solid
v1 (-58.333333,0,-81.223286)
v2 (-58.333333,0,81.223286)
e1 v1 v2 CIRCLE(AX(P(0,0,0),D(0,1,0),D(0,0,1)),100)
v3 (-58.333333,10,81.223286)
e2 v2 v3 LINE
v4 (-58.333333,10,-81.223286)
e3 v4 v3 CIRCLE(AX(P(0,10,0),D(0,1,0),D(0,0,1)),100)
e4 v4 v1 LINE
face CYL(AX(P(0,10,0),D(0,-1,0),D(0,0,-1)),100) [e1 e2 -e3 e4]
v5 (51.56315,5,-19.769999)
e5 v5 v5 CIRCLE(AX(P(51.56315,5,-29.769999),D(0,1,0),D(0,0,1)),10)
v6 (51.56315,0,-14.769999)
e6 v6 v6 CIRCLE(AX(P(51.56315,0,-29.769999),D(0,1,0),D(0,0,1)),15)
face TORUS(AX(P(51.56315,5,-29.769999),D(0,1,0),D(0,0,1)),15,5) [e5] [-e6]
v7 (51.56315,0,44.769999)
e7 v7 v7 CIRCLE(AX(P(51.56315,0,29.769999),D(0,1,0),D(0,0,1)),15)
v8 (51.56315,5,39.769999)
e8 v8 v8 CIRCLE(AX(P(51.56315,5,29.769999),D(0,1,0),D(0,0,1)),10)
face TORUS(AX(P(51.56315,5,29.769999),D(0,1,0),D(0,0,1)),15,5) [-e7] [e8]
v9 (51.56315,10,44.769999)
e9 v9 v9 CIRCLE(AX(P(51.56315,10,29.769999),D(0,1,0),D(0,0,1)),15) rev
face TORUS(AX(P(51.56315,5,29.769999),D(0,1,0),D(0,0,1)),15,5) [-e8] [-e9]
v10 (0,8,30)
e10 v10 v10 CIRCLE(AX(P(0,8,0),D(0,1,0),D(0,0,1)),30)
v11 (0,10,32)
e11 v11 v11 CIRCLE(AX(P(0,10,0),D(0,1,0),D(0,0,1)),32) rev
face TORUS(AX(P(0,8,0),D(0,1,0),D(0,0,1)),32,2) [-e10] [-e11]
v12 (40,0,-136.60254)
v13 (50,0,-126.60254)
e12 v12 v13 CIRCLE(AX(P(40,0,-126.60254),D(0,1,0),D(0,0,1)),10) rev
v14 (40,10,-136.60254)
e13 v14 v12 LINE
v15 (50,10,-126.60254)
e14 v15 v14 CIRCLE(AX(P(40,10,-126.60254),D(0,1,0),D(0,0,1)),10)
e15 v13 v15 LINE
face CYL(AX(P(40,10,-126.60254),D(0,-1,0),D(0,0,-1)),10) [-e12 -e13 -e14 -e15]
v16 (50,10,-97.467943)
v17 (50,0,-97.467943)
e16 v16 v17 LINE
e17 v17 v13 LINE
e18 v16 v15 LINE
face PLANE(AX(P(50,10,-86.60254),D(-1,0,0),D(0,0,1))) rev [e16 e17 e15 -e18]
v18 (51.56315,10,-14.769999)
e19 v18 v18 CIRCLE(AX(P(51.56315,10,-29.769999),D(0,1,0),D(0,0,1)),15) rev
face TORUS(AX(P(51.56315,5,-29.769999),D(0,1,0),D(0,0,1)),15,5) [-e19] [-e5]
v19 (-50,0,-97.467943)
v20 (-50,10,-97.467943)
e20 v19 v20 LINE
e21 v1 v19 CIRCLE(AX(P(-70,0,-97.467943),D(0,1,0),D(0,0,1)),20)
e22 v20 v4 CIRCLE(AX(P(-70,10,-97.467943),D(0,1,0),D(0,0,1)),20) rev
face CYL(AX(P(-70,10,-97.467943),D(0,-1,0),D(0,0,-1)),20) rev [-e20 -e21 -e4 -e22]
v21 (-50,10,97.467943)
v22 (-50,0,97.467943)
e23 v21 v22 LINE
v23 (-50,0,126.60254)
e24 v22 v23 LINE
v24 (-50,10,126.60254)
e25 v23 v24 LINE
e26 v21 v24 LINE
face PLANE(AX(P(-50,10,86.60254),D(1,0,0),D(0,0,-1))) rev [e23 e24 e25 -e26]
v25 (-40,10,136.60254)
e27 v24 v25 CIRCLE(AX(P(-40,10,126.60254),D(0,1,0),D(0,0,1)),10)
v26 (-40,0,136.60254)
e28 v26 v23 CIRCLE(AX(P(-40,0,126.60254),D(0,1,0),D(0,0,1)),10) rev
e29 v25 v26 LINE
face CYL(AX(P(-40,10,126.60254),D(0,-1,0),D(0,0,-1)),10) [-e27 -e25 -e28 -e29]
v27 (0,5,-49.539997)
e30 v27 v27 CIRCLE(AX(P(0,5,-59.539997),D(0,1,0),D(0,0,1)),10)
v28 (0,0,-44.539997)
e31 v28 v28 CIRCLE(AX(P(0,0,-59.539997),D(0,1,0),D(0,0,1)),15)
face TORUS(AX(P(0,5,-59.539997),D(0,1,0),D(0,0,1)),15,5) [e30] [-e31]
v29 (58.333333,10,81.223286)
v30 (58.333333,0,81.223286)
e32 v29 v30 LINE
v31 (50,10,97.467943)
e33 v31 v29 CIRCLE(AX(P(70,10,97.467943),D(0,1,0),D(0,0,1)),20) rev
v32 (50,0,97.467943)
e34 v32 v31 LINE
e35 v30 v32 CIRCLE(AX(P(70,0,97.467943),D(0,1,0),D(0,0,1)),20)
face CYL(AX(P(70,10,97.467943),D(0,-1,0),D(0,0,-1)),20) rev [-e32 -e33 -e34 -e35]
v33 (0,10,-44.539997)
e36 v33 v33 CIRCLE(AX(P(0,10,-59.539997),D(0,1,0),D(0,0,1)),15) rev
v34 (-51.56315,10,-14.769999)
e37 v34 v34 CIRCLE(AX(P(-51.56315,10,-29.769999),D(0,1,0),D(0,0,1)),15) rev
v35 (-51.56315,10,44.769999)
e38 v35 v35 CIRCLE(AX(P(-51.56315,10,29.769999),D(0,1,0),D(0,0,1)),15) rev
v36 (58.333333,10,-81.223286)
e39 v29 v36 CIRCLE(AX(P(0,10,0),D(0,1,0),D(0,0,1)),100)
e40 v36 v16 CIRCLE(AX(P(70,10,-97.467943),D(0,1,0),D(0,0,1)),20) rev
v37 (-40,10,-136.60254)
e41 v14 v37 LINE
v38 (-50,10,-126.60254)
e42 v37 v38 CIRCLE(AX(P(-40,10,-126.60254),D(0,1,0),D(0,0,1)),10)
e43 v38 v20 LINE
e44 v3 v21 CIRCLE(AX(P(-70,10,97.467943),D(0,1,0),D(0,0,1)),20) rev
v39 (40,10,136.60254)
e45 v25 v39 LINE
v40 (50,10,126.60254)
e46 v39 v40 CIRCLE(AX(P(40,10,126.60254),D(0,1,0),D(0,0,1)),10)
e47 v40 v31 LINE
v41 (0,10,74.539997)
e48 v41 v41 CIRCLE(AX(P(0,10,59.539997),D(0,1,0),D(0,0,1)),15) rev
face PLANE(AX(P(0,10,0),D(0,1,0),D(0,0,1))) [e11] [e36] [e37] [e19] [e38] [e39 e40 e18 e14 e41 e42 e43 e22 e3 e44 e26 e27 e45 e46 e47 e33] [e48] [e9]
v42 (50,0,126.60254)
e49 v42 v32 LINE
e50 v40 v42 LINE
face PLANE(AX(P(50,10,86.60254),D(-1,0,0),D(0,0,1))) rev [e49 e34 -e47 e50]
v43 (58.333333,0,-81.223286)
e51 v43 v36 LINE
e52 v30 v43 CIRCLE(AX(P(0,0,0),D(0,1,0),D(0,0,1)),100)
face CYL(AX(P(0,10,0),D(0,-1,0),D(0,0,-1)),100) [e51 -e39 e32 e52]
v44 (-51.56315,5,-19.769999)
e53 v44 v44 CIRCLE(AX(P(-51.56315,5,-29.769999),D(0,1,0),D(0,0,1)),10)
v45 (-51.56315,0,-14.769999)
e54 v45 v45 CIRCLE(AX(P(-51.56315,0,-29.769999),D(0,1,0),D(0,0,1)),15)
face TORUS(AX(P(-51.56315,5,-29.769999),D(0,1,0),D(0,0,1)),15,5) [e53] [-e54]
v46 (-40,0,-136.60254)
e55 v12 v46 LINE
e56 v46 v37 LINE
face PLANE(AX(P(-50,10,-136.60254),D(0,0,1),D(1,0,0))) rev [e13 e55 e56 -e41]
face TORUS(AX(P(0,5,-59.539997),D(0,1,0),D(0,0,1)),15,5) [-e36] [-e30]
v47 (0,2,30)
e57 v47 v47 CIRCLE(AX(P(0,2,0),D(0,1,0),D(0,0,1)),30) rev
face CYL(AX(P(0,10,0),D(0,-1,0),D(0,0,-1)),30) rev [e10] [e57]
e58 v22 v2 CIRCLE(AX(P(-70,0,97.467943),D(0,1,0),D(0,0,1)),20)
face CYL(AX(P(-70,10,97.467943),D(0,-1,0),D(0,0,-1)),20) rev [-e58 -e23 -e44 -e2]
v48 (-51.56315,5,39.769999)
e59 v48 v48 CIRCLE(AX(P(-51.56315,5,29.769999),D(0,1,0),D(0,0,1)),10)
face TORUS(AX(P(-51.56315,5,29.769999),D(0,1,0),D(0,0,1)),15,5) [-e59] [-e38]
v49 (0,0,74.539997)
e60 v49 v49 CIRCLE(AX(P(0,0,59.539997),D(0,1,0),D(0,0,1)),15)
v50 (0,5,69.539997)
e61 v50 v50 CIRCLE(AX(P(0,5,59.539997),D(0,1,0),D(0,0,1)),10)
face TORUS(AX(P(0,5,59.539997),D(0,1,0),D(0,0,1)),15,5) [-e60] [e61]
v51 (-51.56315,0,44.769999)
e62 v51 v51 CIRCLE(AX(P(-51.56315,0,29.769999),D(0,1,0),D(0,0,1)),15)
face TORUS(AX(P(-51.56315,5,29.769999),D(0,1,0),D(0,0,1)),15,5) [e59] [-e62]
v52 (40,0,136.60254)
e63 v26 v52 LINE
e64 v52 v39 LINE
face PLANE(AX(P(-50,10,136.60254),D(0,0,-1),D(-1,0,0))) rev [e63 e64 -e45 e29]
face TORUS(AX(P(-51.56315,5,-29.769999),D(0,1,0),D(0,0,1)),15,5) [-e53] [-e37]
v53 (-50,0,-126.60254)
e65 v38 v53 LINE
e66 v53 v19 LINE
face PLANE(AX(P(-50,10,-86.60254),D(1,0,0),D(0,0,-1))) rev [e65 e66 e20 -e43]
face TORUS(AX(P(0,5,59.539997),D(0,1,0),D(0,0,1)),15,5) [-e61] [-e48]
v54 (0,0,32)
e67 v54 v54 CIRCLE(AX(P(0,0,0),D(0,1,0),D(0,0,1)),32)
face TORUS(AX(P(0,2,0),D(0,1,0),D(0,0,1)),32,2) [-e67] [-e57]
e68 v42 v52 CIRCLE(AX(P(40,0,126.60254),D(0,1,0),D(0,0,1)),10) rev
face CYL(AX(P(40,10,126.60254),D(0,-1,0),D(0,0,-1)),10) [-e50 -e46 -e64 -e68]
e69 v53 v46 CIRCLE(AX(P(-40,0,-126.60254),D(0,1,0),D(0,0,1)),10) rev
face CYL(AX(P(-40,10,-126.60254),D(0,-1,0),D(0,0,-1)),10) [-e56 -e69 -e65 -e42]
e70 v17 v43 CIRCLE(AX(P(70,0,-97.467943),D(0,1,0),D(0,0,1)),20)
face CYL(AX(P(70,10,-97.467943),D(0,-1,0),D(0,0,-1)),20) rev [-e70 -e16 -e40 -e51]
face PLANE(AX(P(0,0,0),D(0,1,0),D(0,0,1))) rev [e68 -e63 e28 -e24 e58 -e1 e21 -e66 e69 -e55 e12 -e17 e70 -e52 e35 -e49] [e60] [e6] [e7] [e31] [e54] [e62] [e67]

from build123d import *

# Parameters (mm, degrees)
ESBO_O1_R                = 30
RESSALTO_EXTRUS_O1_DEPTH = 10
FILETE1_R                = 20
FILETE2_R                = 2
FILETE3_R                = 10
FILETE4_R                = 10
ESBO_O2_R                = 10
CORTE_EXTRUS_O1_DEPTH    = 170.58848439
FILETE5_R                = 5


with BuildPart() as part:
    # Esboço1 → Ressalto-extrusão1 (new body)
    with BuildSketch(Plane(origin=(0, 0, 0), x_dir=(1, 0, 0), z_dir=(0, 1, 0))):
        with BuildLine():
            Line((-50, 136.602540378), (50, 136.602540378))
            Line((50, 136.602540378), (50, 86.602540378))
            ThreePointArc((50, 86.602540378), (100, 0), (50, -86.602540378))
            Line((50, -86.602540378), (50, -136.602540378))
            Line((50, -136.602540378), (-50, -136.602540378))
            Line((-50, -136.602540378), (-50, -86.602540378))
            ThreePointArc((-50, -86.602540378), (-100, 0), (-50, 86.602540378))
            Line((-50, 86.602540378), (-50, 136.602540378))
        make_face()
        with Locations(Location((0, 0, 0), (0, 0, 270))):
            Circle(ESBO_O1_R, mode=Mode.SUBTRACT)
    extrude(amount=RESSALTO_EXTRUS_O1_DEPTH)

    # Filete1
    filete1_edges = [part.edges().sort_by_distance(p)[0] for p in [
        (50, 5, -86.602540378),
        (50, 5, 86.602540378),
        (-50, 5, 86.602540378),
        (-50, 5, -86.602540378),
    ]]
    fillet(filete1_edges, radius=FILETE1_R)

    # Filete2
    filete2_edges = [part.edges().sort_by_distance(p)[0] for p in [
        (0, 0, -30),
        (0, 10, -30),
    ]]
    fillet(filete2_edges, radius=FILETE2_R)

    # Filete3
    filete3_edges = [part.edges().sort_by_distance(p)[0] for p in [
        (50, 5, 136.602540378),
        (-50, 5, 136.602540378),
    ]]
    fillet(filete3_edges, radius=FILETE3_R)

    # Filete4
    filete4_edges = [part.edges().sort_by_distance(p)[0] for p in [
        (-50, 5, -136.602540378),
        (50, 5, -136.602540378),
    ]]
    fillet(filete4_edges, radius=FILETE4_R)

    # Esboço2 → Corte-extrusão1 (cut, through all)
    with BuildSketch(Plane(origin=(0, 10, 0), x_dir=(1, 0, 0), z_dir=(0, 1, 0))):
        with Locations(Location((0, 59.539997486, 0), (0, 0, 270))):
            Circle(ESBO_O2_R)
        with Locations(Location((51.563150364, 29.769998743, 0), (0, 0, 270))):
            Circle(ESBO_O2_R)
        with Locations(Location((51.563150364, -29.769998743, 0), (0, 0, 270))):
            Circle(ESBO_O2_R)
        with Locations(Location((0, -59.539997486, 0), (0, 0, 270))):
            Circle(ESBO_O2_R)
        with Locations(Location((-51.563150364, -29.769998743, 0), (0, 0, 270))):
            Circle(ESBO_O2_R)
        with Locations(Location((-51.563150364, 29.769998743, 0), (0, 0, 270))):
            Circle(ESBO_O2_R)
    extrude(amount=-CORTE_EXTRUS_O1_DEPTH, mode=Mode.SUBTRACT)

    # Filete5
    filete5_edges = [part.edges().sort_by_distance(p)[0] for p in [
        (0, 0, -69.539997486),
        (0, 10, -69.539997486),
        (-51.563150364, 0, -39.769998743),
        (-51.563150364, 10, -39.769998743),
        (-51.563150364, 0, 19.769998743),
        (-51.563150364, 10, 19.769998743),
        (0, 0, 49.539997486),
        (0, 10, 49.539997486),
        (51.563150364, 0, 19.769998743),
        (51.563150364, 10, 19.769998743),
        (51.563150364, 0, -39.769998743),
        (51.563150364, 10, -39.769998743),
    ]]
    fillet(filete5_edges, radius=FILETE5_R - 0.0001)  # a hair under: the kernel refuses the full size


solid = part.part
